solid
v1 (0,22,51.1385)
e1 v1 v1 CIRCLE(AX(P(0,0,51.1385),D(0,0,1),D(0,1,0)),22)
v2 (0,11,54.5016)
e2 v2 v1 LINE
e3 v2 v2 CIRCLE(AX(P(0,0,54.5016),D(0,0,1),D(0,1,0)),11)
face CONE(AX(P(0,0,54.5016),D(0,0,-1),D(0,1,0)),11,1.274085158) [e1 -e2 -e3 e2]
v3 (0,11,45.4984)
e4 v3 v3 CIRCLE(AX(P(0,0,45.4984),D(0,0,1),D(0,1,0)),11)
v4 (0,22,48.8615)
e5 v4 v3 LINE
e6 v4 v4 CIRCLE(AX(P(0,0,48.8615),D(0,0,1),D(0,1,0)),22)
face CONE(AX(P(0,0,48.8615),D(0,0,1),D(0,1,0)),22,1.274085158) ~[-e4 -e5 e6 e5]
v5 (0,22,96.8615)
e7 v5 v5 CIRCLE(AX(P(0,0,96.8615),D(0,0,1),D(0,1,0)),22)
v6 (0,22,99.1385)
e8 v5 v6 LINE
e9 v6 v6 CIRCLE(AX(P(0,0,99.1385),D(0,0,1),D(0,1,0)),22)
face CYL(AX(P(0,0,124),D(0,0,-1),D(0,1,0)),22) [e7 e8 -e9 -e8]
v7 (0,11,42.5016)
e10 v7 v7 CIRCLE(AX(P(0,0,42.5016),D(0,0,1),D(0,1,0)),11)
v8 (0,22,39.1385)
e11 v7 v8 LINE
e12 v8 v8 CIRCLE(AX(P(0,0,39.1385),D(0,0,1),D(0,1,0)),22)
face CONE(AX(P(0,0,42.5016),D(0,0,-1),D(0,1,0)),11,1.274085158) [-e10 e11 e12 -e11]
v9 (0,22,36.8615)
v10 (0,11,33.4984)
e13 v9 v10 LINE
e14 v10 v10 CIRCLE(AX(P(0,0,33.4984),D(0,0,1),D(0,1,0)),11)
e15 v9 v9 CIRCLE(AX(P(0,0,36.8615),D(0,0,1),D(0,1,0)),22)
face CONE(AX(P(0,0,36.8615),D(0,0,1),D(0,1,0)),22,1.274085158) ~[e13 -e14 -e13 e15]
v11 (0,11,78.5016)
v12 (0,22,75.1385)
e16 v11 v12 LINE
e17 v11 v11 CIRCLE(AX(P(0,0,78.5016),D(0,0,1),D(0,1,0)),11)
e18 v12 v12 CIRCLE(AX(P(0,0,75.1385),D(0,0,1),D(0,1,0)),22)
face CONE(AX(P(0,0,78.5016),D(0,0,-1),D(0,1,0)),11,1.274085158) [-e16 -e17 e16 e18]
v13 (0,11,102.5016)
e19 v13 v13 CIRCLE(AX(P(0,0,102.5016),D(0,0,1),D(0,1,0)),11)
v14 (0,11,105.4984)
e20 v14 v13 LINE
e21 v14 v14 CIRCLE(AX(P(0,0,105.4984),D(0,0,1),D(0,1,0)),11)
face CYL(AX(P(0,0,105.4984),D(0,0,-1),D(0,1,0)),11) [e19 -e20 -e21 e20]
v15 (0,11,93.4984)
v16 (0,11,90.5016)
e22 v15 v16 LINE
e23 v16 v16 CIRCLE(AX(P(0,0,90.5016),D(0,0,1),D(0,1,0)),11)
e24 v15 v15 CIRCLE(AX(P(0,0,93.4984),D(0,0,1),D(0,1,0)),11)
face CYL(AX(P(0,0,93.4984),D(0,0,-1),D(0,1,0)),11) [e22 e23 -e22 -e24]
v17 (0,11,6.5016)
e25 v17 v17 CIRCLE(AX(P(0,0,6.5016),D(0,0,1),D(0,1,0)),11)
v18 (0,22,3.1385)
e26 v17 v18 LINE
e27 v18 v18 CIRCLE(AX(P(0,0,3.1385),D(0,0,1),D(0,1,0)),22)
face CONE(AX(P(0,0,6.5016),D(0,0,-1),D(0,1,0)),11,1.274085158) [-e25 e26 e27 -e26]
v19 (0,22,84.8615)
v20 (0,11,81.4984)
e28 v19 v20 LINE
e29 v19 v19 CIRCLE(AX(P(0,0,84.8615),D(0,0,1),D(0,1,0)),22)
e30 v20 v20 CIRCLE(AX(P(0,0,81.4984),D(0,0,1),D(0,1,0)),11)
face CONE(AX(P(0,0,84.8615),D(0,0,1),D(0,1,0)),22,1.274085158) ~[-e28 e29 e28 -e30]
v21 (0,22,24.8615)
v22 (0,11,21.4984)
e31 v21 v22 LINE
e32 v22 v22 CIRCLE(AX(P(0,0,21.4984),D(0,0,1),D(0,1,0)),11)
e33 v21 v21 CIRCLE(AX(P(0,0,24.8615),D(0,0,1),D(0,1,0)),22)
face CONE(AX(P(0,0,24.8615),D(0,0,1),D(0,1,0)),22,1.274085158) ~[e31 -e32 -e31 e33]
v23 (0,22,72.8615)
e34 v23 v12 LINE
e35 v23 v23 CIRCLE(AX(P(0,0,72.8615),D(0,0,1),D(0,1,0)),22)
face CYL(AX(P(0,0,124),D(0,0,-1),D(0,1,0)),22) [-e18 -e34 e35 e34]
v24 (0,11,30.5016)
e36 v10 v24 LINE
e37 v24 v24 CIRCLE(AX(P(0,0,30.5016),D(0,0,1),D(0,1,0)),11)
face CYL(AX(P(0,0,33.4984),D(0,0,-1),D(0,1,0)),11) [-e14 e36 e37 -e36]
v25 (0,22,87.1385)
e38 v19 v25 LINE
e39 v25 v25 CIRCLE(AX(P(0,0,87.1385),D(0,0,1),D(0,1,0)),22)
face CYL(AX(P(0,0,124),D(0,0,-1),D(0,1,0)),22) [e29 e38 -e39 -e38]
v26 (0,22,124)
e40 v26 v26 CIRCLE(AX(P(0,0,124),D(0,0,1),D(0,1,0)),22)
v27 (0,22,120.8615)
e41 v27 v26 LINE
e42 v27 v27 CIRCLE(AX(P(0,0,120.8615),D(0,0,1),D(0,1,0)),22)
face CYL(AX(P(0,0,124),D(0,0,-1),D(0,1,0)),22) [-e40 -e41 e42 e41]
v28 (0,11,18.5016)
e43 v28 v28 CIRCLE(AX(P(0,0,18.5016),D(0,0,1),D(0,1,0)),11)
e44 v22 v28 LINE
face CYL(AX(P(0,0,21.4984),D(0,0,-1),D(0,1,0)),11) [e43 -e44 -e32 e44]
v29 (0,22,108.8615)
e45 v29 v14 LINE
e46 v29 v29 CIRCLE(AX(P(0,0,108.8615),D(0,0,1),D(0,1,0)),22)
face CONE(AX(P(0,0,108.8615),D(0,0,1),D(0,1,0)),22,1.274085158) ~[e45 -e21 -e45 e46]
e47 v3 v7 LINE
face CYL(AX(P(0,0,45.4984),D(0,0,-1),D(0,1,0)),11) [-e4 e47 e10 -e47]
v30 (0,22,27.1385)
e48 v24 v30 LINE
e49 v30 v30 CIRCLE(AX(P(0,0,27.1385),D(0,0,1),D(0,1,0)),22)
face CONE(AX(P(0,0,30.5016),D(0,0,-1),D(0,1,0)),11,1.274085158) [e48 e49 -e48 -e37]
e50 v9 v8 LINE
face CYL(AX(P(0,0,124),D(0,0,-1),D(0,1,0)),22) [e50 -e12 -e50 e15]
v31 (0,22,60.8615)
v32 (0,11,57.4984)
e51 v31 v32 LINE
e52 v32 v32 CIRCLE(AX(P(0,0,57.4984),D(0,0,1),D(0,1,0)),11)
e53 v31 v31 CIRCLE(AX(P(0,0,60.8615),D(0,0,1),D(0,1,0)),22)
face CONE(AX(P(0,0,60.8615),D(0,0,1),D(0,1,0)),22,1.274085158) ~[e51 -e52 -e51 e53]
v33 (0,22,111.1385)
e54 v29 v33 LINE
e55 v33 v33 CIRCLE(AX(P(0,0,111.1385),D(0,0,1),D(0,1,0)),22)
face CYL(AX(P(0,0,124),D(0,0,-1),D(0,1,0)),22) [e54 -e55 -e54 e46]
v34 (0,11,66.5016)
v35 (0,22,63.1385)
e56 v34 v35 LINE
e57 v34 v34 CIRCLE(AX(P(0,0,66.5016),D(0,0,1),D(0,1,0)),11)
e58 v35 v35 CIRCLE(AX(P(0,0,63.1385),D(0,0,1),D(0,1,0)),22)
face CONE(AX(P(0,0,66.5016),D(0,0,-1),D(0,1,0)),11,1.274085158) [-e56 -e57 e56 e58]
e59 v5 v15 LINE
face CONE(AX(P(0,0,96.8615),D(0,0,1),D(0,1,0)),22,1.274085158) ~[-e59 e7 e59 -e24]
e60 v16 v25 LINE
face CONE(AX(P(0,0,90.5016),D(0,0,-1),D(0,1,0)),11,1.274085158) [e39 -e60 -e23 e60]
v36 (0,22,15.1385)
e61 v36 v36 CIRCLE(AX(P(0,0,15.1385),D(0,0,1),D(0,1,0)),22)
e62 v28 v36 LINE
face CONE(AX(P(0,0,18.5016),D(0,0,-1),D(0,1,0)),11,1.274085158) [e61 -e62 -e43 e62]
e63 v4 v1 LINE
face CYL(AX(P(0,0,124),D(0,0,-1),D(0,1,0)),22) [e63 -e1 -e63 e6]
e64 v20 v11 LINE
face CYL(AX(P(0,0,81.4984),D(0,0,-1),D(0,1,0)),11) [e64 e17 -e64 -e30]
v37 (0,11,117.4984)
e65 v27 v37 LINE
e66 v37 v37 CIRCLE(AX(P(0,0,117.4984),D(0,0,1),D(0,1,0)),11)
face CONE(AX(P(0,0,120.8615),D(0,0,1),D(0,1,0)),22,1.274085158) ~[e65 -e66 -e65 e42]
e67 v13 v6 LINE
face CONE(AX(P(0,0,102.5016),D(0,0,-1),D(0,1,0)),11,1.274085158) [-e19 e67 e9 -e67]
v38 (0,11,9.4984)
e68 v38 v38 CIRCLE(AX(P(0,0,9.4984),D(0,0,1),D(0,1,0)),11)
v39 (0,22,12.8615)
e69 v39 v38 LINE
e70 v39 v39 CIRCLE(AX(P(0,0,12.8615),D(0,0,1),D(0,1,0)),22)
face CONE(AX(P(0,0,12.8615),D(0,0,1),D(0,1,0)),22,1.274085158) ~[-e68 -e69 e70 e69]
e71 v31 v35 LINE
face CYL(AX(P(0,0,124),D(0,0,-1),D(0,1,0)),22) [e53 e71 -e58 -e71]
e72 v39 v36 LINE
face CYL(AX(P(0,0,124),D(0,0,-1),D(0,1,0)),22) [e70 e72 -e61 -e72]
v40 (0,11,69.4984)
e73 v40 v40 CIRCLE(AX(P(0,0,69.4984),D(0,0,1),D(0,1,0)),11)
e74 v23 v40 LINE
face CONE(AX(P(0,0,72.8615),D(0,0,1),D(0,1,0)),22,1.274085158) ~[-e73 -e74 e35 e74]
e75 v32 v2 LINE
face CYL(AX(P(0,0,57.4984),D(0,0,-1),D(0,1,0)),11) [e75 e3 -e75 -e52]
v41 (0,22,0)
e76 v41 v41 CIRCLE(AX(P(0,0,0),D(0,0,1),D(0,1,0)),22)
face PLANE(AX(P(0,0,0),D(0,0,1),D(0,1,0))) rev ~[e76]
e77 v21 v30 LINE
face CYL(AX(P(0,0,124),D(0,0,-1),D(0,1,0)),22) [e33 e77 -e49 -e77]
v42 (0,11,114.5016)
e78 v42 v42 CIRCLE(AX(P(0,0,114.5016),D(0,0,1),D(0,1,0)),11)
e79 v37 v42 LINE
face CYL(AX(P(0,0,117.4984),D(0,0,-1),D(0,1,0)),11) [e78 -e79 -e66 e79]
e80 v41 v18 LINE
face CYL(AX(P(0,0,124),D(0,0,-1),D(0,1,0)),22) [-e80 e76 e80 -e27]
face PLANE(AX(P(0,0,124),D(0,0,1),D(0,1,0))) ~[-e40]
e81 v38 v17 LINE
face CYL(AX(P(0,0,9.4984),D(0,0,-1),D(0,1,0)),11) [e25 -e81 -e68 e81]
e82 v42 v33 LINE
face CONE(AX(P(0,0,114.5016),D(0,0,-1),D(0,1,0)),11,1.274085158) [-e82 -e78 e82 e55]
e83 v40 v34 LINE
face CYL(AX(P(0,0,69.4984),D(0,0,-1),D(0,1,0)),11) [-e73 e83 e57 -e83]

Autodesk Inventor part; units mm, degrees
ref_plane "YZ Plane" through (0, 0, 0) normal (1, 0, 0) x (0, 1, 0)
ref_plane "XZ Plane" through (0, 0, 0) normal (0, 1, 0) x (-1, 0, 0)
sketch "Main Sketch" plane through (0, 0, 0) normal (1, 0, 0) x (0, 1, 0)
  line L0 (0, 124) -> (22, 124)
  line L1 (22, 124) -> (22, 12.8615)
  line L2 (22, 12.8615) -> (11, 9.4984)
  line L3 (11, 9.4984) -> (11, 6.5016)
  line L4 (11, 6.5016) -> (22, 3.1385)
  line L5 (22, 3.1385) -> (22, 0)
  line L6 (22, 0) -> (0, 0)
  line L7 (20, 12.25) -> (20, 3.75) construction
  line L8 (11, 8) -> (20, 8) construction
  line L9 (22, 12.8615) -> (22, 3.1385)
  line L10 (0, -4) -> (0, 24) projected
  line L11 (0, 0) -> (0, 124)
  dimension "d0" = 8.5
  dimension "d1" = 34
  dimension "d2" = 2
  dimension "d6" = 124
  dimension "d21" = 40
  dimension "d25" = 11
  dimension "d27" = 8
ref_plane "Belt Plane" through (0, 11, 8) normal (0, 0, 1) x (1, 0, 0)
revolve "Body" add sketch "Main Sketch" angle 360 about axis through (0, 0, -10) along (0, 0, 1)
revolve "Groove" cut sketch "Main Sketch" angle 360 about axis through (0, 0, -10) along (0, 0, 1) contours L9 L4 L3 L2
fillet "Fillet External" [suppressed]
fillet "Fillet Internal" [suppressed]
pattern_linear "Groove Pattern" count 10 spacing 12 along (0, 0, 1) of "Groove"
equation "\"d0\" = da_Bw"
equation "\"d1\" = da_Alfa"
equation "\"d2\" = da_c"
equation "\"d21\" = da_Dw"
equation "\"d25\" = da_Hd"
equation "\"d27\" = da_Se"
equation "\"da_r1\" = 0"
equation "\"da_r2\" = 0"
equation "\"d18\" = da_Sg"
equation "\"d5\" = da_Se"
equation "\"da_Bw\" = 8.5"
equation "\"da_Alfa\" = 34deg"
equation "\"da_c\" = 2"
equation "\"da_Dw\" = 40"
equation "\"da_Hd\" = 11"
equation "\"da_Se\" = 8"
equation "\"da_Sg\" = 12"
properties part number "Grooved Pulley1" material "Steel"
